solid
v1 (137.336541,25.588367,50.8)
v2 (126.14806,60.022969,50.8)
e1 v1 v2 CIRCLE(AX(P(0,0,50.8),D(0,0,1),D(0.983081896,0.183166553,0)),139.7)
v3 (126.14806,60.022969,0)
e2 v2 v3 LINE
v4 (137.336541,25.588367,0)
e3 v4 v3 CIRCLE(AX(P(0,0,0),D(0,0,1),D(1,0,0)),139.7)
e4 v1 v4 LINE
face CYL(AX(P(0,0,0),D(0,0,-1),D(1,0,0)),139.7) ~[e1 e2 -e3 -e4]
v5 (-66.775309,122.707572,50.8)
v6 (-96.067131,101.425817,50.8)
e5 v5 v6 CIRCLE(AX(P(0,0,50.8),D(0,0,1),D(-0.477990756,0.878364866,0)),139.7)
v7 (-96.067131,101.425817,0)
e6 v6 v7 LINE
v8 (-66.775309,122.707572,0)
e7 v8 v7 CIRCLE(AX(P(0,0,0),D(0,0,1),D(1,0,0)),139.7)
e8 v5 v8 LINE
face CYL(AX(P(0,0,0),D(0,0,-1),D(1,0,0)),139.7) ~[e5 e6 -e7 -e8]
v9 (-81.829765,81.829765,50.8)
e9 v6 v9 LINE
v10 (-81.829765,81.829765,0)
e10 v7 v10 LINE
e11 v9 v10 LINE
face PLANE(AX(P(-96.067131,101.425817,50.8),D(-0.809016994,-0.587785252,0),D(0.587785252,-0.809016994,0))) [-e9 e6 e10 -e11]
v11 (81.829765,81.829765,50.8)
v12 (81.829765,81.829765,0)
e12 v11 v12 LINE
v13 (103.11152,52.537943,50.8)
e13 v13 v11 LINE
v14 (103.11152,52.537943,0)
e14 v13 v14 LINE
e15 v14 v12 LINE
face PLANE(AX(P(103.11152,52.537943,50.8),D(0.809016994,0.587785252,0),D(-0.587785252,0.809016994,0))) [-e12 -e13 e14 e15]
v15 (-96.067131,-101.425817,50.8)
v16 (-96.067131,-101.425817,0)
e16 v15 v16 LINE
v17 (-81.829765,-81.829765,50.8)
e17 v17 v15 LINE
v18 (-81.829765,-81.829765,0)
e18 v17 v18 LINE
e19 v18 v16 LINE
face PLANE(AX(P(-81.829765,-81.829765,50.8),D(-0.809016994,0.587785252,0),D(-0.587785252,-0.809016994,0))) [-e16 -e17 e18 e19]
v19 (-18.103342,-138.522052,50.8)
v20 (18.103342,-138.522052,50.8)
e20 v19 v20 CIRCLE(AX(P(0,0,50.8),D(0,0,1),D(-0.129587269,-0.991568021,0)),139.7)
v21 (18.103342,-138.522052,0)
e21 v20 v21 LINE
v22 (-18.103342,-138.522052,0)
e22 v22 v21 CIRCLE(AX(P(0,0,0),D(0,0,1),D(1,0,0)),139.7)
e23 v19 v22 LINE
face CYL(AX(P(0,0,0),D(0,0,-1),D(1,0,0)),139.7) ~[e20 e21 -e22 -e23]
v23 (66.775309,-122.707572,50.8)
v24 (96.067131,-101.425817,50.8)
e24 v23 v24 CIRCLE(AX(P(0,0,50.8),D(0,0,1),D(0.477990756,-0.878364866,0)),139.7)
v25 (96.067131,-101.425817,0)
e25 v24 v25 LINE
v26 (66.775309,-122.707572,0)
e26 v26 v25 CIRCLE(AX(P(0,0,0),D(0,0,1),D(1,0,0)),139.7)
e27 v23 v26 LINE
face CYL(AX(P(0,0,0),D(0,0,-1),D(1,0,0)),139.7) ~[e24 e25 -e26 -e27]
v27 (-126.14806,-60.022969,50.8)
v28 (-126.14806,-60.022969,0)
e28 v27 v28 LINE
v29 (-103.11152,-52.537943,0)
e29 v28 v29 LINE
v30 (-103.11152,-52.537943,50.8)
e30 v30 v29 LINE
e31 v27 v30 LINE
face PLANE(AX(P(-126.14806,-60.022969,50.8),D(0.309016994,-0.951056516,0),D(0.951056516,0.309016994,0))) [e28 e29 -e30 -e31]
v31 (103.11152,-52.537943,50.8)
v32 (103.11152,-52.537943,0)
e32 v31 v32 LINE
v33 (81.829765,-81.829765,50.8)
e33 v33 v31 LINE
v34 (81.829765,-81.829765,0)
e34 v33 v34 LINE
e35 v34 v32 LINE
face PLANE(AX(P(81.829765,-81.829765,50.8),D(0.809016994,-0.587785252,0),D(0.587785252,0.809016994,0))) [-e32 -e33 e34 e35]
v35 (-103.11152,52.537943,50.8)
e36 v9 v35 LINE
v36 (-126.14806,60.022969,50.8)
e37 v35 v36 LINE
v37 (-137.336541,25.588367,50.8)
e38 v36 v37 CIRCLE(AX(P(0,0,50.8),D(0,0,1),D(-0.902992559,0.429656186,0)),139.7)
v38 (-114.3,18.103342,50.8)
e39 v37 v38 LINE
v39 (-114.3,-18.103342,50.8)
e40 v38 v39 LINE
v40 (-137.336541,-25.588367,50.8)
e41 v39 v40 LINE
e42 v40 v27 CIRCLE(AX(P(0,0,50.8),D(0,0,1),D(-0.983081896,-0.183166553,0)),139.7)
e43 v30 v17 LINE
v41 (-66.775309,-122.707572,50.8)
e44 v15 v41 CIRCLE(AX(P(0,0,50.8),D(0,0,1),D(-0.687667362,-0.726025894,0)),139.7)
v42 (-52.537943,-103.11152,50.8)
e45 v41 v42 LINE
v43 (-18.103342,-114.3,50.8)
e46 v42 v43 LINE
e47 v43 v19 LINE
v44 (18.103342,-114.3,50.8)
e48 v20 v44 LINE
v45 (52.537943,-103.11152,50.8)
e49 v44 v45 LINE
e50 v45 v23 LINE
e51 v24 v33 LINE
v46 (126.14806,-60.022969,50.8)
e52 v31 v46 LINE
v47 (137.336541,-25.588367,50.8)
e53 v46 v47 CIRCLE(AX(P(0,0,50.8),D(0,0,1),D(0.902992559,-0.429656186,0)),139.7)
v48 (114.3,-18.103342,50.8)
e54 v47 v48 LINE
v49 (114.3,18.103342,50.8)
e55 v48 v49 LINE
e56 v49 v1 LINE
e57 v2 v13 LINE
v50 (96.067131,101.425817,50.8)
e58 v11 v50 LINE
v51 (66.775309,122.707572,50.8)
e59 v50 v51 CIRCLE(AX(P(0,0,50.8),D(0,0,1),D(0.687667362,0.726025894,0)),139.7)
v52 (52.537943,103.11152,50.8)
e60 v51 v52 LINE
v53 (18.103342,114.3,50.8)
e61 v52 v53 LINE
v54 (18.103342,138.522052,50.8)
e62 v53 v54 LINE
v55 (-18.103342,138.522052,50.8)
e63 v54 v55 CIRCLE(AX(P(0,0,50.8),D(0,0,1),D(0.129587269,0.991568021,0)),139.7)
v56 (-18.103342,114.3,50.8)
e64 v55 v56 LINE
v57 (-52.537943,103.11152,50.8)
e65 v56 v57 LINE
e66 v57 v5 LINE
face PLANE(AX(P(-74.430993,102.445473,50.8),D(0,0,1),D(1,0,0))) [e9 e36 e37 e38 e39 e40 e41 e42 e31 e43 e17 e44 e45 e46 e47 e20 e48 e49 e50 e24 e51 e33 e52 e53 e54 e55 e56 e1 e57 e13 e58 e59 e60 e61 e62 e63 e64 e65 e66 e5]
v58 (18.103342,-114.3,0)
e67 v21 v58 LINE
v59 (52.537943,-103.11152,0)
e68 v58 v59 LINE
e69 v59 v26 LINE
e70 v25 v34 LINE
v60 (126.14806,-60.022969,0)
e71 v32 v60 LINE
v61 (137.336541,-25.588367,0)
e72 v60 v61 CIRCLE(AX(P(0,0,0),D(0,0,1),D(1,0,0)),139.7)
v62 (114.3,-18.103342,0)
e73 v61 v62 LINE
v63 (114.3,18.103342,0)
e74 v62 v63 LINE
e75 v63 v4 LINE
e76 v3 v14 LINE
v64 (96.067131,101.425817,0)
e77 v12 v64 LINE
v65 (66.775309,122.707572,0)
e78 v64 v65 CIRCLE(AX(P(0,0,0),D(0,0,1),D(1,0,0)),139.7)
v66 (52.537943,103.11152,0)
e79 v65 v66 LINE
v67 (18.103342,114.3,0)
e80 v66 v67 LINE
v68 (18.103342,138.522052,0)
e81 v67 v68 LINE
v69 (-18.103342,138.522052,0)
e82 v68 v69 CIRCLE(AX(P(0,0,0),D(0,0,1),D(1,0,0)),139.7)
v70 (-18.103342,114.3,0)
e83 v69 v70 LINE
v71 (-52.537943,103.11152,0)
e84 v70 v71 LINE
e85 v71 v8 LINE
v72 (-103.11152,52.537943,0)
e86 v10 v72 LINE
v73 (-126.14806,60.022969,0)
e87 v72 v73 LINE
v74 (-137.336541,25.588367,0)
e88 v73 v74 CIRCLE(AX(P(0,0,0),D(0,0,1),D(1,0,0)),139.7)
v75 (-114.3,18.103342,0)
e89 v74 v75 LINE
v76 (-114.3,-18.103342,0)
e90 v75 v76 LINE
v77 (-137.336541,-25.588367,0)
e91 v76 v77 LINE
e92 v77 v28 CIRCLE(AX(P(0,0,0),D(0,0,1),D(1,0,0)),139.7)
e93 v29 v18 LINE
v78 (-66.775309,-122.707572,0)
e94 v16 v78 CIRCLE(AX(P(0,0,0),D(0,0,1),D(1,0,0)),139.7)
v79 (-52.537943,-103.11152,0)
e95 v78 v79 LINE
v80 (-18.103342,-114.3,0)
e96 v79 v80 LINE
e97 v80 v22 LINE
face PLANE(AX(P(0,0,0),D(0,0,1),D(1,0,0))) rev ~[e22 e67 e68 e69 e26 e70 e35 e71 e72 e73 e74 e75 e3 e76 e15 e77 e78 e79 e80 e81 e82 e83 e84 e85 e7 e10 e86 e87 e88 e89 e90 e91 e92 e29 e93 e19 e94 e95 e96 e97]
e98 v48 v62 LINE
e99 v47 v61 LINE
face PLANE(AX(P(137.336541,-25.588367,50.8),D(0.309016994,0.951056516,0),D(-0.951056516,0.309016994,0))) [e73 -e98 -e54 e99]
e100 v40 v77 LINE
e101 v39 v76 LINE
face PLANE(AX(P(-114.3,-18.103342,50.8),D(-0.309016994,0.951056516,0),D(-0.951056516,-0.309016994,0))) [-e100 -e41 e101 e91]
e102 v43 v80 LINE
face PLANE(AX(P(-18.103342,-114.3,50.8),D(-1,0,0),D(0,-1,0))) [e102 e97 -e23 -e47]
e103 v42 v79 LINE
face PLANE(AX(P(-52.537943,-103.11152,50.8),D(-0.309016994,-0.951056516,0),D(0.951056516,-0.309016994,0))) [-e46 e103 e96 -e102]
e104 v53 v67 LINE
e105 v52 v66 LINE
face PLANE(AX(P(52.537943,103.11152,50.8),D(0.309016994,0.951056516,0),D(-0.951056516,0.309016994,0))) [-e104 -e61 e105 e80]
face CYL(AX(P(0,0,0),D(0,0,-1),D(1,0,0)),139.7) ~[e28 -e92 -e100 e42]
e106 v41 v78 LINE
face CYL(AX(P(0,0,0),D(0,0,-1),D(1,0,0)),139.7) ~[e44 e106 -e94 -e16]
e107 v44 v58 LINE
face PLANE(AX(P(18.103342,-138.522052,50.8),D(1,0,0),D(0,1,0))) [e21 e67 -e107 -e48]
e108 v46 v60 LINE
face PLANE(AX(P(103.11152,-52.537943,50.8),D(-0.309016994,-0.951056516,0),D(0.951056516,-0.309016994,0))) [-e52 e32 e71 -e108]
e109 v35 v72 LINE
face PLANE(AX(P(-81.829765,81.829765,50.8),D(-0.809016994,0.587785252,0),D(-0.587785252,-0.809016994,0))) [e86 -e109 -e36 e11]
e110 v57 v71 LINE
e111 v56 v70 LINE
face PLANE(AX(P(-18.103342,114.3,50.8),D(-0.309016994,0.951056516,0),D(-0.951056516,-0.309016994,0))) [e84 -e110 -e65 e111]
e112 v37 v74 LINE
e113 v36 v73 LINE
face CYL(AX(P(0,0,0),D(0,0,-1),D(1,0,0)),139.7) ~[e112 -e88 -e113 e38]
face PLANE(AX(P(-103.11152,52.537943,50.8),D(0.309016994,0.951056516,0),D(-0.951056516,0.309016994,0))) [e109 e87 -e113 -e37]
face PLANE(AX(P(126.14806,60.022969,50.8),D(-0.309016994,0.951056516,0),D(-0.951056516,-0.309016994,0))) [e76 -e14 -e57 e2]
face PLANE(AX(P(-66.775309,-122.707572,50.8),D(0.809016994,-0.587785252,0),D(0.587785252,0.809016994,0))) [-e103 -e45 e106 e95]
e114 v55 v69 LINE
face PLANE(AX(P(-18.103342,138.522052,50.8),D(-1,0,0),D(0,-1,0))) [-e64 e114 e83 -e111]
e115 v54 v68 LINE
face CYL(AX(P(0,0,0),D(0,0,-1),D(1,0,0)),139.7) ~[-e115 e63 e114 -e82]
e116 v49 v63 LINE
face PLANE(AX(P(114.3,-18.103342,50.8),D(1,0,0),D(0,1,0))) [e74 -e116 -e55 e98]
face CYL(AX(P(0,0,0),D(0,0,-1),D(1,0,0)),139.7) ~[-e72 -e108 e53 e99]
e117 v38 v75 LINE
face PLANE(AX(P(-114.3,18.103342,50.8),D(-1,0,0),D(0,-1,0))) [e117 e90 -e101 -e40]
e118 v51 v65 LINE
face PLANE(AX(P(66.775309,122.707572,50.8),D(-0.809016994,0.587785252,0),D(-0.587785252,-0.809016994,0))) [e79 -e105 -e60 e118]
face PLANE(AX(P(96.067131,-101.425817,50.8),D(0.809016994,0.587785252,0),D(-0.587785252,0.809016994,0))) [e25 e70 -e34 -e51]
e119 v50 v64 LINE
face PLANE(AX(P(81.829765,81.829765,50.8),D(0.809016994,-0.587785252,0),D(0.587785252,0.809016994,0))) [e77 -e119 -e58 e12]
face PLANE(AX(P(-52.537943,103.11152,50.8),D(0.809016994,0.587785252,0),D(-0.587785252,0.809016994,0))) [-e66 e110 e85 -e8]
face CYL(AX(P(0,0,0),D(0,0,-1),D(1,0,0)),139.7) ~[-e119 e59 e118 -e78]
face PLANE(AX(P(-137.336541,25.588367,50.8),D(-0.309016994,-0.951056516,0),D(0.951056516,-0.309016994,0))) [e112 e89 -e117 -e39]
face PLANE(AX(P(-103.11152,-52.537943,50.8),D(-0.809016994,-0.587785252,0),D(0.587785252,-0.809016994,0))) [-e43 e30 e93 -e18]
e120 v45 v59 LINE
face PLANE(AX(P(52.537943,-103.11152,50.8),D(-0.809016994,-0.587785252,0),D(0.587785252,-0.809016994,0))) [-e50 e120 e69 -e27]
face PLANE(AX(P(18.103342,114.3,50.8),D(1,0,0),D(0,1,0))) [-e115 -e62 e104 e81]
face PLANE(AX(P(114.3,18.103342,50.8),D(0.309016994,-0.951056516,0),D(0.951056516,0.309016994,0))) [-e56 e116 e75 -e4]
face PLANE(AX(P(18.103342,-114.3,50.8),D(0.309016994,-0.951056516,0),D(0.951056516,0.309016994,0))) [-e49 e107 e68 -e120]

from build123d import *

# Parameters (mm, degrees)
F0_R     = 139.7
F1_DEPTH = 50.8
F3_DEPTH = 50.801


with BuildPart() as f1:
    # F0 (on Top) → F1 (new body)
    with BuildSketch(Plane.XY):
        Circle(F0_R)
    extrude(amount=F1_DEPTH)

    # F2 (on face) → F3 (intersect, through all)
    with BuildSketch(Plane.XY.offset(50.8)):
        with BuildLine():
            Line((-81.829765289, 81.829765289), (-52.537943385, 103.1115196251))
            Line((-52.537943385, 103.1115196251), (-66.7753086177, 122.7075717265))
            ThreePointArc((-66.7753086177, 122.7075717265), (-82.1135997453, 113.0196741142), (-96.0671305217, 101.4258173904))
            Line((-96.0671305217, 101.4258173905), (-81.829765289, 81.829765289))
        make_face()
        with BuildLine():
            Line((-18.1033415291, 114.3), (18.1033415291, 114.3))
            Line((18.1033415291, 114.3), (18.1033415291, 138.522052488))
            ThreePointArc((18.1033415291, 138.522052488), (0, 139.7), (-18.1033415291, 138.522052488))
            Line((-18.1033415291, 138.522052488), (-18.1033415291, 114.3))
        make_face()
        with BuildLine():
            Line((52.537943385, 103.1115196251), (81.829765289, 81.829765289))
            Line((81.829765289, 81.829765289), (96.0671305217, 101.4258173905))
            ThreePointArc((96.0671305217, 101.4258173904), (82.1135997453, 113.0196741142), (66.7753086177, 122.7075717265))
            Line((66.7753086177, 122.7075717265), (52.537943385, 103.1115196251))
        make_face()
        with BuildLine():
            Line((103.1115196251, 52.537943385), (114.3, 18.1033415291))
            Line((114.3, 18.1033415291), (137.3365408567, 25.5883673865))
            ThreePointArc((137.3365408567, 25.5883673865), (132.8625953264, 43.1696741142), (126.1480604818, 60.0229692424))
            Line((126.1480604818, 60.0229692424), (103.1115196251, 52.537943385))
        make_face()
        with BuildLine():
            Line((137.3365408567, -25.5883673865), (114.3, -18.1033415291))
            Line((114.3, -18.1033415291), (103.1115196251, -52.537943385))
            Line((103.1115196251, -52.537943385), (126.1480604818, -60.0229692424))
            ThreePointArc((126.1480604818, -60.0229692424), (132.8625953264, -43.1696741142), (137.3365408567, -25.5883673865))
        make_face()
        with BuildLine():
            Line((96.0671305217, -101.4258173905), (81.829765289, -81.829765289))
            Line((81.829765289, -81.829765289), (52.537943385, -103.1115196251))
            Line((52.537943385, -103.1115196251), (66.7753086177, -122.7075717265))
            ThreePointArc((66.7753086177, -122.7075717265), (82.1135997453, -113.0196741142), (96.0671305217, -101.4258173904))
        make_face()
        with BuildLine():
            Line((18.1033415291, -138.522052488), (18.1033415291, -114.3))
            Line((18.1033415291, -114.3), (-18.1033415291, -114.3))
            Line((-18.1033415291, -114.3), (-18.1033415291, -138.522052488))
            ThreePointArc((-18.1033415291, -138.522052488), (0, -139.7), (18.1033415291, -138.522052488))
        make_face()
        with BuildLine():
            Line((-66.7753086177, -122.7075717265), (-52.537943385, -103.1115196251))
            Line((-52.537943385, -103.1115196251), (-81.829765289, -81.829765289))
            Line((-81.829765289, -81.829765289), (-96.0671305217, -101.4258173905))
            ThreePointArc((-96.0671305217, -101.4258173904), (-82.1135997453, -113.0196741142), (-66.7753086177, -122.7075717265))
        make_face()
        with BuildLine():
            Line((-126.1480604818, -60.0229692424), (-103.1115196251, -52.537943385))
            Line((-103.1115196251, -52.537943385), (-114.3, -18.1033415291))
            Line((-114.3, -18.1033415291), (-137.3365408567, -25.5883673865))
            ThreePointArc((-137.3365408567, -25.5883673865), (-132.8625953264, -43.1696741142), (-126.1480604818, -60.0229692424))
        make_face()
        with BuildLine():
            Line((-114.3, 18.1033415291), (-103.1115196251, 52.537943385))
            Line((-103.1115196251, 52.537943385), (-126.1480604818, 60.0229692424))
            ThreePointArc((-126.1480604818, 60.0229692424), (-132.8625953264, 43.1696741142), (-137.3365408567, 25.5883673865))
            Line((-137.3365408567, 25.5883673865), (-114.3, 18.1033415291))
        make_face()
        Polygon((114.3, -18.1033415291), (114.3, 18.1033415291), (103.1115196251, 52.537943385), (81.829765289, 81.829765289), (52.537943385, 103.1115196251), (18.1033415291, 114.3), (-18.1033415291, 114.3), (-52.537943385, 103.1115196251), (-81.829765289, 81.829765289), (-103.1115196251, 52.537943385), (-114.3, 18.1033415291), (-114.3, -18.1033415291), (-103.1115196251, -52.537943385), (-81.829765289, -81.829765289), (-52.537943385, -103.1115196251), (-18.1033415291, -114.3), (18.1033415291, -114.3), (52.537943385, -103.1115196251), (81.829765289, -81.829765289), (103.1115196251, -52.537943385), align=None)
    extrude(amount=-F3_DEPTH, mode=Mode.INTERSECT)


solid = f1.part
